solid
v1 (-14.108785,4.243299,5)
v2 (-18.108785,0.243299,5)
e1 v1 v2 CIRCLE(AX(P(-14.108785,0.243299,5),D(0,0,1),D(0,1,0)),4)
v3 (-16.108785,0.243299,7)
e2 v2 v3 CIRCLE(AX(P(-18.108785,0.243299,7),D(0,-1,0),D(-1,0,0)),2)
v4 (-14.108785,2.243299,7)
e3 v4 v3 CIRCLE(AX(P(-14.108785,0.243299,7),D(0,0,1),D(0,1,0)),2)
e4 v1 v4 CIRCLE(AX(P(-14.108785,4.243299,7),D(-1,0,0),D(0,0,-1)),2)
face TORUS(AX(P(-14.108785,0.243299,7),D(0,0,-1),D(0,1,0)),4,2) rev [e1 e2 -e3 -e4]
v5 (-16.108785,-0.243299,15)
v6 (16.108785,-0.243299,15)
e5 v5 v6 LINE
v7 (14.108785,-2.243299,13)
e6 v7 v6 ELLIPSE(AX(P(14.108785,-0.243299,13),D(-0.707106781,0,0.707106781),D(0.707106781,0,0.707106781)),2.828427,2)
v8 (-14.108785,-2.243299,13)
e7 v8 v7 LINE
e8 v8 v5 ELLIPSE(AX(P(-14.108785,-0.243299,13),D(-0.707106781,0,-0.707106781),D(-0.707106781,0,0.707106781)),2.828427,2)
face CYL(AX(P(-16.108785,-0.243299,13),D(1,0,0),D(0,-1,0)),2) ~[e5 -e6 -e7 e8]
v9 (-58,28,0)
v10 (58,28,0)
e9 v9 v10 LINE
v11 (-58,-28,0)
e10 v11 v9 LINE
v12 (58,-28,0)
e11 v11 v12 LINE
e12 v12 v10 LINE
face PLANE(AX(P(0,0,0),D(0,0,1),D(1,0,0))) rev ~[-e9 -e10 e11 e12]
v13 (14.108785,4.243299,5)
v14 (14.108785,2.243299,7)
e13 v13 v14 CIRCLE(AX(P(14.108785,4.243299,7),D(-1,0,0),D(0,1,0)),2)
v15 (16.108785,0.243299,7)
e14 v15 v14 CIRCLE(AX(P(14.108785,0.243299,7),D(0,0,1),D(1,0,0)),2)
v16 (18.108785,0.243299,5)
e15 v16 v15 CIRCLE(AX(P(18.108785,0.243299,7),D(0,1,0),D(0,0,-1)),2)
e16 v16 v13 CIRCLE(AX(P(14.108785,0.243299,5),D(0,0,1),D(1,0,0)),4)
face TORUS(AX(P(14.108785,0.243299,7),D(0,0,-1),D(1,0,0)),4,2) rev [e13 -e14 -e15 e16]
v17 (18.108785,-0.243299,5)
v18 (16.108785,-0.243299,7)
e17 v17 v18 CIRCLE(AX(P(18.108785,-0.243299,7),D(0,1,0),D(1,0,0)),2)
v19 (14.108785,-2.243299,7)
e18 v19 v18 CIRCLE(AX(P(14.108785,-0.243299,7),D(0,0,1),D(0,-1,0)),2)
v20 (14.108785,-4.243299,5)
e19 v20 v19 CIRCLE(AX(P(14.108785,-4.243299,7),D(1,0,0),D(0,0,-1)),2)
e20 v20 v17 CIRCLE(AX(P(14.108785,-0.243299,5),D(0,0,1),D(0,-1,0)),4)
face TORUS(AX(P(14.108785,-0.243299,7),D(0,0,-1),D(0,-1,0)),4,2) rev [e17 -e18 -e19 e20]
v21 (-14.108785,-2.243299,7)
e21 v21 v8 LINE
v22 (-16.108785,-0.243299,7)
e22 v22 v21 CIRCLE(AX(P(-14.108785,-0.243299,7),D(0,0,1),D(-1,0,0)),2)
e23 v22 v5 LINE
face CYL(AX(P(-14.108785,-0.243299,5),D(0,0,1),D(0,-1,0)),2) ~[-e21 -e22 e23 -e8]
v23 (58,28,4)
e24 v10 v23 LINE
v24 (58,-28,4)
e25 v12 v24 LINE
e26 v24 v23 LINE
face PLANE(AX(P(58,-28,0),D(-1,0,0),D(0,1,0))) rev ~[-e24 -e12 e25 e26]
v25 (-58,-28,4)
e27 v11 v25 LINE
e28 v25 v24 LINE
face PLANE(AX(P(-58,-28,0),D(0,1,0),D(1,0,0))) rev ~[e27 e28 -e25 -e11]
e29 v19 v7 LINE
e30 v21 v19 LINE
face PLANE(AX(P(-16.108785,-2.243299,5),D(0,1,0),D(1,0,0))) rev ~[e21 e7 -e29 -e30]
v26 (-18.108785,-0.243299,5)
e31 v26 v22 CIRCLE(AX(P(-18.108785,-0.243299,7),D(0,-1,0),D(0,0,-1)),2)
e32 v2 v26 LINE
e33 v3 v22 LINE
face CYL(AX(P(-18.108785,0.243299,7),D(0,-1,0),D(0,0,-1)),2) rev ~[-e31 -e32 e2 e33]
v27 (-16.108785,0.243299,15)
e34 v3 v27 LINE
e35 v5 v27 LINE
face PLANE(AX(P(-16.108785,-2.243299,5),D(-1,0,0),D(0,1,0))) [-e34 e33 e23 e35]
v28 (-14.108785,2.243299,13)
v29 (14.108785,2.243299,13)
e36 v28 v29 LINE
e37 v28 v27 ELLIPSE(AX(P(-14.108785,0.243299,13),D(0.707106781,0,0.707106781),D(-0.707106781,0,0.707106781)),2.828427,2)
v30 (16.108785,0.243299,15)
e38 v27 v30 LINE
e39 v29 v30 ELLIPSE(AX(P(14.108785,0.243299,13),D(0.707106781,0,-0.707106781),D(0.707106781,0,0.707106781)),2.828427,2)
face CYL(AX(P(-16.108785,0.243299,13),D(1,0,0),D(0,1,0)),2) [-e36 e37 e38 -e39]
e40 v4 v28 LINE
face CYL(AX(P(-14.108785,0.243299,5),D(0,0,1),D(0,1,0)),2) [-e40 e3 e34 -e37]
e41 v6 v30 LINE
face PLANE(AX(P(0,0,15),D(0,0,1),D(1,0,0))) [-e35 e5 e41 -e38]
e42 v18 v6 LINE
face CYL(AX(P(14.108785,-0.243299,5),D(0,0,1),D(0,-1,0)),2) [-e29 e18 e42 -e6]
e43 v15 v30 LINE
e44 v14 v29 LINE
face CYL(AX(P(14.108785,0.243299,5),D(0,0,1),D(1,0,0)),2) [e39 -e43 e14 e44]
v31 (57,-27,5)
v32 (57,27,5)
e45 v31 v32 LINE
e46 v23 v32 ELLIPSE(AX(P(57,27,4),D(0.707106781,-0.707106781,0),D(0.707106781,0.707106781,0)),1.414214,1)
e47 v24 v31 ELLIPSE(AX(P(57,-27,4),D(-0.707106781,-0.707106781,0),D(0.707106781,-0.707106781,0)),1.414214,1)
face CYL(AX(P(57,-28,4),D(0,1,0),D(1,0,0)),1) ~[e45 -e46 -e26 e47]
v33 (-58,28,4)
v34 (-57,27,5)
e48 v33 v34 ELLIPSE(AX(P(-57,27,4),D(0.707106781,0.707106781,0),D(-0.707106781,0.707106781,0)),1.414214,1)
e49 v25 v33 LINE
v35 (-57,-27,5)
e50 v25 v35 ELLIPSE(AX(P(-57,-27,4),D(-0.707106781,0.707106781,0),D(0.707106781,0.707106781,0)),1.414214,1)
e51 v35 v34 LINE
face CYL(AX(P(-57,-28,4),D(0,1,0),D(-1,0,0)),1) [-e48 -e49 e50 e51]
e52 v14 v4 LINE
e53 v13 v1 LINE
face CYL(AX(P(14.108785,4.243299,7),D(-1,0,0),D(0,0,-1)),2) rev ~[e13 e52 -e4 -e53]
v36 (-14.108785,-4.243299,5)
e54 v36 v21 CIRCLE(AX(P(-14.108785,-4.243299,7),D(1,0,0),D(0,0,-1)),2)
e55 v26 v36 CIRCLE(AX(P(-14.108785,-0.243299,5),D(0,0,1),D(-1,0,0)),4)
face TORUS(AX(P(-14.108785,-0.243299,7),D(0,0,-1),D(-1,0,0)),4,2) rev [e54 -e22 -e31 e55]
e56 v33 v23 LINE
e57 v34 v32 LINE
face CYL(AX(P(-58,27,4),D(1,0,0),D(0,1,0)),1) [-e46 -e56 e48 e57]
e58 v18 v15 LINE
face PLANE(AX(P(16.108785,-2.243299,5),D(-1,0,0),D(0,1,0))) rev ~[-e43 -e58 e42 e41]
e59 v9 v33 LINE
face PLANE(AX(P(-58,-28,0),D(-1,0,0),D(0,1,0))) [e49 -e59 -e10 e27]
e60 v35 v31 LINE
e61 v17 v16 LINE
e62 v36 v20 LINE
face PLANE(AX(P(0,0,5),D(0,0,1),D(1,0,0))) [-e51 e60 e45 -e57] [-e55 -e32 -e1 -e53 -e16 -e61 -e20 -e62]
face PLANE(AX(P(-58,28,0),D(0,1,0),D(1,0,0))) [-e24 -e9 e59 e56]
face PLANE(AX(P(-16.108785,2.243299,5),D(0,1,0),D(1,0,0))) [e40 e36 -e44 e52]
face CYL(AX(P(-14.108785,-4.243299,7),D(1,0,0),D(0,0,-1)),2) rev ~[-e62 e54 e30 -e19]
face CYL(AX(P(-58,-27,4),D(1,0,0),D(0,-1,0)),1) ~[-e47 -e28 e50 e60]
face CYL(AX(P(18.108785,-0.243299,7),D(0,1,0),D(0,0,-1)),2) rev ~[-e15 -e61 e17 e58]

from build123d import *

# Parameters (mm, degrees)
F0_W     = 116
F0_H     = 56
F1_DEPTH = 5
F2_R     = 1
F3_W     = 32.2175696492
F3_H     = 4.4865976088
F4_DEPTH = 10
F5_F1_R  = 2
F5_F2_R  = 2


with BuildPart() as f1:
    # F0 (on Top) → F1 (new body)
    with BuildSketch(Plane.XY):
        Rectangle(F0_W, F0_H)
    extrude(amount=F1_DEPTH)

    # F2
    f2_edges = [f1.edges().sort_by_distance(p)[0] for p in [
        (0, -28, 5),
        (-58, 0, 5),
        (0, 28, 5),
        (58, 0, 5),
    ]]
    fillet(f2_edges, radius=F2_R)

    # F3 (on face) → F4 (join)
    with BuildSketch(Plane.XY.offset(5)):
        Rectangle(F3_W, F3_H)
    extrude(amount=F4_DEPTH)

    # F5: fillet of radius 2 on 8 edges, made by hand

    # F5_f1
    f5_f1_edges = [f1.edges().sort_by_distance(p)[0] for p in [
        (-16.1087848246, -2.2432988044, 10),
        (-16.1087848246, 2.2432988044, 10),
        (0, -2.2432988044, 15),
        (0, 2.2432988044, 15),
        (16.1087848246, -2.2432988044, 10),
        (16.1087848246, 2.2432988044, 10),
    ]]
    fillet(f5_f1_edges, radius=F5_F1_R)

    # F5_f2
    f5_f2_edges = [f1.edges().sort_by_distance(p)[0] for p in [
        (0, -2.2432988044, 5),
        (0, 2.2432988044, 5),
        (15.522998387, 1.6575123668, 5),
        (-15.522998387, 1.6575123668, 5),
        (-15.522998387, -1.6575123668, 5),
        (15.522998387, -1.6575123668, 5),
    ]]
    fillet(f5_f2_edges, radius=F5_F2_R)


solid = f1.part
